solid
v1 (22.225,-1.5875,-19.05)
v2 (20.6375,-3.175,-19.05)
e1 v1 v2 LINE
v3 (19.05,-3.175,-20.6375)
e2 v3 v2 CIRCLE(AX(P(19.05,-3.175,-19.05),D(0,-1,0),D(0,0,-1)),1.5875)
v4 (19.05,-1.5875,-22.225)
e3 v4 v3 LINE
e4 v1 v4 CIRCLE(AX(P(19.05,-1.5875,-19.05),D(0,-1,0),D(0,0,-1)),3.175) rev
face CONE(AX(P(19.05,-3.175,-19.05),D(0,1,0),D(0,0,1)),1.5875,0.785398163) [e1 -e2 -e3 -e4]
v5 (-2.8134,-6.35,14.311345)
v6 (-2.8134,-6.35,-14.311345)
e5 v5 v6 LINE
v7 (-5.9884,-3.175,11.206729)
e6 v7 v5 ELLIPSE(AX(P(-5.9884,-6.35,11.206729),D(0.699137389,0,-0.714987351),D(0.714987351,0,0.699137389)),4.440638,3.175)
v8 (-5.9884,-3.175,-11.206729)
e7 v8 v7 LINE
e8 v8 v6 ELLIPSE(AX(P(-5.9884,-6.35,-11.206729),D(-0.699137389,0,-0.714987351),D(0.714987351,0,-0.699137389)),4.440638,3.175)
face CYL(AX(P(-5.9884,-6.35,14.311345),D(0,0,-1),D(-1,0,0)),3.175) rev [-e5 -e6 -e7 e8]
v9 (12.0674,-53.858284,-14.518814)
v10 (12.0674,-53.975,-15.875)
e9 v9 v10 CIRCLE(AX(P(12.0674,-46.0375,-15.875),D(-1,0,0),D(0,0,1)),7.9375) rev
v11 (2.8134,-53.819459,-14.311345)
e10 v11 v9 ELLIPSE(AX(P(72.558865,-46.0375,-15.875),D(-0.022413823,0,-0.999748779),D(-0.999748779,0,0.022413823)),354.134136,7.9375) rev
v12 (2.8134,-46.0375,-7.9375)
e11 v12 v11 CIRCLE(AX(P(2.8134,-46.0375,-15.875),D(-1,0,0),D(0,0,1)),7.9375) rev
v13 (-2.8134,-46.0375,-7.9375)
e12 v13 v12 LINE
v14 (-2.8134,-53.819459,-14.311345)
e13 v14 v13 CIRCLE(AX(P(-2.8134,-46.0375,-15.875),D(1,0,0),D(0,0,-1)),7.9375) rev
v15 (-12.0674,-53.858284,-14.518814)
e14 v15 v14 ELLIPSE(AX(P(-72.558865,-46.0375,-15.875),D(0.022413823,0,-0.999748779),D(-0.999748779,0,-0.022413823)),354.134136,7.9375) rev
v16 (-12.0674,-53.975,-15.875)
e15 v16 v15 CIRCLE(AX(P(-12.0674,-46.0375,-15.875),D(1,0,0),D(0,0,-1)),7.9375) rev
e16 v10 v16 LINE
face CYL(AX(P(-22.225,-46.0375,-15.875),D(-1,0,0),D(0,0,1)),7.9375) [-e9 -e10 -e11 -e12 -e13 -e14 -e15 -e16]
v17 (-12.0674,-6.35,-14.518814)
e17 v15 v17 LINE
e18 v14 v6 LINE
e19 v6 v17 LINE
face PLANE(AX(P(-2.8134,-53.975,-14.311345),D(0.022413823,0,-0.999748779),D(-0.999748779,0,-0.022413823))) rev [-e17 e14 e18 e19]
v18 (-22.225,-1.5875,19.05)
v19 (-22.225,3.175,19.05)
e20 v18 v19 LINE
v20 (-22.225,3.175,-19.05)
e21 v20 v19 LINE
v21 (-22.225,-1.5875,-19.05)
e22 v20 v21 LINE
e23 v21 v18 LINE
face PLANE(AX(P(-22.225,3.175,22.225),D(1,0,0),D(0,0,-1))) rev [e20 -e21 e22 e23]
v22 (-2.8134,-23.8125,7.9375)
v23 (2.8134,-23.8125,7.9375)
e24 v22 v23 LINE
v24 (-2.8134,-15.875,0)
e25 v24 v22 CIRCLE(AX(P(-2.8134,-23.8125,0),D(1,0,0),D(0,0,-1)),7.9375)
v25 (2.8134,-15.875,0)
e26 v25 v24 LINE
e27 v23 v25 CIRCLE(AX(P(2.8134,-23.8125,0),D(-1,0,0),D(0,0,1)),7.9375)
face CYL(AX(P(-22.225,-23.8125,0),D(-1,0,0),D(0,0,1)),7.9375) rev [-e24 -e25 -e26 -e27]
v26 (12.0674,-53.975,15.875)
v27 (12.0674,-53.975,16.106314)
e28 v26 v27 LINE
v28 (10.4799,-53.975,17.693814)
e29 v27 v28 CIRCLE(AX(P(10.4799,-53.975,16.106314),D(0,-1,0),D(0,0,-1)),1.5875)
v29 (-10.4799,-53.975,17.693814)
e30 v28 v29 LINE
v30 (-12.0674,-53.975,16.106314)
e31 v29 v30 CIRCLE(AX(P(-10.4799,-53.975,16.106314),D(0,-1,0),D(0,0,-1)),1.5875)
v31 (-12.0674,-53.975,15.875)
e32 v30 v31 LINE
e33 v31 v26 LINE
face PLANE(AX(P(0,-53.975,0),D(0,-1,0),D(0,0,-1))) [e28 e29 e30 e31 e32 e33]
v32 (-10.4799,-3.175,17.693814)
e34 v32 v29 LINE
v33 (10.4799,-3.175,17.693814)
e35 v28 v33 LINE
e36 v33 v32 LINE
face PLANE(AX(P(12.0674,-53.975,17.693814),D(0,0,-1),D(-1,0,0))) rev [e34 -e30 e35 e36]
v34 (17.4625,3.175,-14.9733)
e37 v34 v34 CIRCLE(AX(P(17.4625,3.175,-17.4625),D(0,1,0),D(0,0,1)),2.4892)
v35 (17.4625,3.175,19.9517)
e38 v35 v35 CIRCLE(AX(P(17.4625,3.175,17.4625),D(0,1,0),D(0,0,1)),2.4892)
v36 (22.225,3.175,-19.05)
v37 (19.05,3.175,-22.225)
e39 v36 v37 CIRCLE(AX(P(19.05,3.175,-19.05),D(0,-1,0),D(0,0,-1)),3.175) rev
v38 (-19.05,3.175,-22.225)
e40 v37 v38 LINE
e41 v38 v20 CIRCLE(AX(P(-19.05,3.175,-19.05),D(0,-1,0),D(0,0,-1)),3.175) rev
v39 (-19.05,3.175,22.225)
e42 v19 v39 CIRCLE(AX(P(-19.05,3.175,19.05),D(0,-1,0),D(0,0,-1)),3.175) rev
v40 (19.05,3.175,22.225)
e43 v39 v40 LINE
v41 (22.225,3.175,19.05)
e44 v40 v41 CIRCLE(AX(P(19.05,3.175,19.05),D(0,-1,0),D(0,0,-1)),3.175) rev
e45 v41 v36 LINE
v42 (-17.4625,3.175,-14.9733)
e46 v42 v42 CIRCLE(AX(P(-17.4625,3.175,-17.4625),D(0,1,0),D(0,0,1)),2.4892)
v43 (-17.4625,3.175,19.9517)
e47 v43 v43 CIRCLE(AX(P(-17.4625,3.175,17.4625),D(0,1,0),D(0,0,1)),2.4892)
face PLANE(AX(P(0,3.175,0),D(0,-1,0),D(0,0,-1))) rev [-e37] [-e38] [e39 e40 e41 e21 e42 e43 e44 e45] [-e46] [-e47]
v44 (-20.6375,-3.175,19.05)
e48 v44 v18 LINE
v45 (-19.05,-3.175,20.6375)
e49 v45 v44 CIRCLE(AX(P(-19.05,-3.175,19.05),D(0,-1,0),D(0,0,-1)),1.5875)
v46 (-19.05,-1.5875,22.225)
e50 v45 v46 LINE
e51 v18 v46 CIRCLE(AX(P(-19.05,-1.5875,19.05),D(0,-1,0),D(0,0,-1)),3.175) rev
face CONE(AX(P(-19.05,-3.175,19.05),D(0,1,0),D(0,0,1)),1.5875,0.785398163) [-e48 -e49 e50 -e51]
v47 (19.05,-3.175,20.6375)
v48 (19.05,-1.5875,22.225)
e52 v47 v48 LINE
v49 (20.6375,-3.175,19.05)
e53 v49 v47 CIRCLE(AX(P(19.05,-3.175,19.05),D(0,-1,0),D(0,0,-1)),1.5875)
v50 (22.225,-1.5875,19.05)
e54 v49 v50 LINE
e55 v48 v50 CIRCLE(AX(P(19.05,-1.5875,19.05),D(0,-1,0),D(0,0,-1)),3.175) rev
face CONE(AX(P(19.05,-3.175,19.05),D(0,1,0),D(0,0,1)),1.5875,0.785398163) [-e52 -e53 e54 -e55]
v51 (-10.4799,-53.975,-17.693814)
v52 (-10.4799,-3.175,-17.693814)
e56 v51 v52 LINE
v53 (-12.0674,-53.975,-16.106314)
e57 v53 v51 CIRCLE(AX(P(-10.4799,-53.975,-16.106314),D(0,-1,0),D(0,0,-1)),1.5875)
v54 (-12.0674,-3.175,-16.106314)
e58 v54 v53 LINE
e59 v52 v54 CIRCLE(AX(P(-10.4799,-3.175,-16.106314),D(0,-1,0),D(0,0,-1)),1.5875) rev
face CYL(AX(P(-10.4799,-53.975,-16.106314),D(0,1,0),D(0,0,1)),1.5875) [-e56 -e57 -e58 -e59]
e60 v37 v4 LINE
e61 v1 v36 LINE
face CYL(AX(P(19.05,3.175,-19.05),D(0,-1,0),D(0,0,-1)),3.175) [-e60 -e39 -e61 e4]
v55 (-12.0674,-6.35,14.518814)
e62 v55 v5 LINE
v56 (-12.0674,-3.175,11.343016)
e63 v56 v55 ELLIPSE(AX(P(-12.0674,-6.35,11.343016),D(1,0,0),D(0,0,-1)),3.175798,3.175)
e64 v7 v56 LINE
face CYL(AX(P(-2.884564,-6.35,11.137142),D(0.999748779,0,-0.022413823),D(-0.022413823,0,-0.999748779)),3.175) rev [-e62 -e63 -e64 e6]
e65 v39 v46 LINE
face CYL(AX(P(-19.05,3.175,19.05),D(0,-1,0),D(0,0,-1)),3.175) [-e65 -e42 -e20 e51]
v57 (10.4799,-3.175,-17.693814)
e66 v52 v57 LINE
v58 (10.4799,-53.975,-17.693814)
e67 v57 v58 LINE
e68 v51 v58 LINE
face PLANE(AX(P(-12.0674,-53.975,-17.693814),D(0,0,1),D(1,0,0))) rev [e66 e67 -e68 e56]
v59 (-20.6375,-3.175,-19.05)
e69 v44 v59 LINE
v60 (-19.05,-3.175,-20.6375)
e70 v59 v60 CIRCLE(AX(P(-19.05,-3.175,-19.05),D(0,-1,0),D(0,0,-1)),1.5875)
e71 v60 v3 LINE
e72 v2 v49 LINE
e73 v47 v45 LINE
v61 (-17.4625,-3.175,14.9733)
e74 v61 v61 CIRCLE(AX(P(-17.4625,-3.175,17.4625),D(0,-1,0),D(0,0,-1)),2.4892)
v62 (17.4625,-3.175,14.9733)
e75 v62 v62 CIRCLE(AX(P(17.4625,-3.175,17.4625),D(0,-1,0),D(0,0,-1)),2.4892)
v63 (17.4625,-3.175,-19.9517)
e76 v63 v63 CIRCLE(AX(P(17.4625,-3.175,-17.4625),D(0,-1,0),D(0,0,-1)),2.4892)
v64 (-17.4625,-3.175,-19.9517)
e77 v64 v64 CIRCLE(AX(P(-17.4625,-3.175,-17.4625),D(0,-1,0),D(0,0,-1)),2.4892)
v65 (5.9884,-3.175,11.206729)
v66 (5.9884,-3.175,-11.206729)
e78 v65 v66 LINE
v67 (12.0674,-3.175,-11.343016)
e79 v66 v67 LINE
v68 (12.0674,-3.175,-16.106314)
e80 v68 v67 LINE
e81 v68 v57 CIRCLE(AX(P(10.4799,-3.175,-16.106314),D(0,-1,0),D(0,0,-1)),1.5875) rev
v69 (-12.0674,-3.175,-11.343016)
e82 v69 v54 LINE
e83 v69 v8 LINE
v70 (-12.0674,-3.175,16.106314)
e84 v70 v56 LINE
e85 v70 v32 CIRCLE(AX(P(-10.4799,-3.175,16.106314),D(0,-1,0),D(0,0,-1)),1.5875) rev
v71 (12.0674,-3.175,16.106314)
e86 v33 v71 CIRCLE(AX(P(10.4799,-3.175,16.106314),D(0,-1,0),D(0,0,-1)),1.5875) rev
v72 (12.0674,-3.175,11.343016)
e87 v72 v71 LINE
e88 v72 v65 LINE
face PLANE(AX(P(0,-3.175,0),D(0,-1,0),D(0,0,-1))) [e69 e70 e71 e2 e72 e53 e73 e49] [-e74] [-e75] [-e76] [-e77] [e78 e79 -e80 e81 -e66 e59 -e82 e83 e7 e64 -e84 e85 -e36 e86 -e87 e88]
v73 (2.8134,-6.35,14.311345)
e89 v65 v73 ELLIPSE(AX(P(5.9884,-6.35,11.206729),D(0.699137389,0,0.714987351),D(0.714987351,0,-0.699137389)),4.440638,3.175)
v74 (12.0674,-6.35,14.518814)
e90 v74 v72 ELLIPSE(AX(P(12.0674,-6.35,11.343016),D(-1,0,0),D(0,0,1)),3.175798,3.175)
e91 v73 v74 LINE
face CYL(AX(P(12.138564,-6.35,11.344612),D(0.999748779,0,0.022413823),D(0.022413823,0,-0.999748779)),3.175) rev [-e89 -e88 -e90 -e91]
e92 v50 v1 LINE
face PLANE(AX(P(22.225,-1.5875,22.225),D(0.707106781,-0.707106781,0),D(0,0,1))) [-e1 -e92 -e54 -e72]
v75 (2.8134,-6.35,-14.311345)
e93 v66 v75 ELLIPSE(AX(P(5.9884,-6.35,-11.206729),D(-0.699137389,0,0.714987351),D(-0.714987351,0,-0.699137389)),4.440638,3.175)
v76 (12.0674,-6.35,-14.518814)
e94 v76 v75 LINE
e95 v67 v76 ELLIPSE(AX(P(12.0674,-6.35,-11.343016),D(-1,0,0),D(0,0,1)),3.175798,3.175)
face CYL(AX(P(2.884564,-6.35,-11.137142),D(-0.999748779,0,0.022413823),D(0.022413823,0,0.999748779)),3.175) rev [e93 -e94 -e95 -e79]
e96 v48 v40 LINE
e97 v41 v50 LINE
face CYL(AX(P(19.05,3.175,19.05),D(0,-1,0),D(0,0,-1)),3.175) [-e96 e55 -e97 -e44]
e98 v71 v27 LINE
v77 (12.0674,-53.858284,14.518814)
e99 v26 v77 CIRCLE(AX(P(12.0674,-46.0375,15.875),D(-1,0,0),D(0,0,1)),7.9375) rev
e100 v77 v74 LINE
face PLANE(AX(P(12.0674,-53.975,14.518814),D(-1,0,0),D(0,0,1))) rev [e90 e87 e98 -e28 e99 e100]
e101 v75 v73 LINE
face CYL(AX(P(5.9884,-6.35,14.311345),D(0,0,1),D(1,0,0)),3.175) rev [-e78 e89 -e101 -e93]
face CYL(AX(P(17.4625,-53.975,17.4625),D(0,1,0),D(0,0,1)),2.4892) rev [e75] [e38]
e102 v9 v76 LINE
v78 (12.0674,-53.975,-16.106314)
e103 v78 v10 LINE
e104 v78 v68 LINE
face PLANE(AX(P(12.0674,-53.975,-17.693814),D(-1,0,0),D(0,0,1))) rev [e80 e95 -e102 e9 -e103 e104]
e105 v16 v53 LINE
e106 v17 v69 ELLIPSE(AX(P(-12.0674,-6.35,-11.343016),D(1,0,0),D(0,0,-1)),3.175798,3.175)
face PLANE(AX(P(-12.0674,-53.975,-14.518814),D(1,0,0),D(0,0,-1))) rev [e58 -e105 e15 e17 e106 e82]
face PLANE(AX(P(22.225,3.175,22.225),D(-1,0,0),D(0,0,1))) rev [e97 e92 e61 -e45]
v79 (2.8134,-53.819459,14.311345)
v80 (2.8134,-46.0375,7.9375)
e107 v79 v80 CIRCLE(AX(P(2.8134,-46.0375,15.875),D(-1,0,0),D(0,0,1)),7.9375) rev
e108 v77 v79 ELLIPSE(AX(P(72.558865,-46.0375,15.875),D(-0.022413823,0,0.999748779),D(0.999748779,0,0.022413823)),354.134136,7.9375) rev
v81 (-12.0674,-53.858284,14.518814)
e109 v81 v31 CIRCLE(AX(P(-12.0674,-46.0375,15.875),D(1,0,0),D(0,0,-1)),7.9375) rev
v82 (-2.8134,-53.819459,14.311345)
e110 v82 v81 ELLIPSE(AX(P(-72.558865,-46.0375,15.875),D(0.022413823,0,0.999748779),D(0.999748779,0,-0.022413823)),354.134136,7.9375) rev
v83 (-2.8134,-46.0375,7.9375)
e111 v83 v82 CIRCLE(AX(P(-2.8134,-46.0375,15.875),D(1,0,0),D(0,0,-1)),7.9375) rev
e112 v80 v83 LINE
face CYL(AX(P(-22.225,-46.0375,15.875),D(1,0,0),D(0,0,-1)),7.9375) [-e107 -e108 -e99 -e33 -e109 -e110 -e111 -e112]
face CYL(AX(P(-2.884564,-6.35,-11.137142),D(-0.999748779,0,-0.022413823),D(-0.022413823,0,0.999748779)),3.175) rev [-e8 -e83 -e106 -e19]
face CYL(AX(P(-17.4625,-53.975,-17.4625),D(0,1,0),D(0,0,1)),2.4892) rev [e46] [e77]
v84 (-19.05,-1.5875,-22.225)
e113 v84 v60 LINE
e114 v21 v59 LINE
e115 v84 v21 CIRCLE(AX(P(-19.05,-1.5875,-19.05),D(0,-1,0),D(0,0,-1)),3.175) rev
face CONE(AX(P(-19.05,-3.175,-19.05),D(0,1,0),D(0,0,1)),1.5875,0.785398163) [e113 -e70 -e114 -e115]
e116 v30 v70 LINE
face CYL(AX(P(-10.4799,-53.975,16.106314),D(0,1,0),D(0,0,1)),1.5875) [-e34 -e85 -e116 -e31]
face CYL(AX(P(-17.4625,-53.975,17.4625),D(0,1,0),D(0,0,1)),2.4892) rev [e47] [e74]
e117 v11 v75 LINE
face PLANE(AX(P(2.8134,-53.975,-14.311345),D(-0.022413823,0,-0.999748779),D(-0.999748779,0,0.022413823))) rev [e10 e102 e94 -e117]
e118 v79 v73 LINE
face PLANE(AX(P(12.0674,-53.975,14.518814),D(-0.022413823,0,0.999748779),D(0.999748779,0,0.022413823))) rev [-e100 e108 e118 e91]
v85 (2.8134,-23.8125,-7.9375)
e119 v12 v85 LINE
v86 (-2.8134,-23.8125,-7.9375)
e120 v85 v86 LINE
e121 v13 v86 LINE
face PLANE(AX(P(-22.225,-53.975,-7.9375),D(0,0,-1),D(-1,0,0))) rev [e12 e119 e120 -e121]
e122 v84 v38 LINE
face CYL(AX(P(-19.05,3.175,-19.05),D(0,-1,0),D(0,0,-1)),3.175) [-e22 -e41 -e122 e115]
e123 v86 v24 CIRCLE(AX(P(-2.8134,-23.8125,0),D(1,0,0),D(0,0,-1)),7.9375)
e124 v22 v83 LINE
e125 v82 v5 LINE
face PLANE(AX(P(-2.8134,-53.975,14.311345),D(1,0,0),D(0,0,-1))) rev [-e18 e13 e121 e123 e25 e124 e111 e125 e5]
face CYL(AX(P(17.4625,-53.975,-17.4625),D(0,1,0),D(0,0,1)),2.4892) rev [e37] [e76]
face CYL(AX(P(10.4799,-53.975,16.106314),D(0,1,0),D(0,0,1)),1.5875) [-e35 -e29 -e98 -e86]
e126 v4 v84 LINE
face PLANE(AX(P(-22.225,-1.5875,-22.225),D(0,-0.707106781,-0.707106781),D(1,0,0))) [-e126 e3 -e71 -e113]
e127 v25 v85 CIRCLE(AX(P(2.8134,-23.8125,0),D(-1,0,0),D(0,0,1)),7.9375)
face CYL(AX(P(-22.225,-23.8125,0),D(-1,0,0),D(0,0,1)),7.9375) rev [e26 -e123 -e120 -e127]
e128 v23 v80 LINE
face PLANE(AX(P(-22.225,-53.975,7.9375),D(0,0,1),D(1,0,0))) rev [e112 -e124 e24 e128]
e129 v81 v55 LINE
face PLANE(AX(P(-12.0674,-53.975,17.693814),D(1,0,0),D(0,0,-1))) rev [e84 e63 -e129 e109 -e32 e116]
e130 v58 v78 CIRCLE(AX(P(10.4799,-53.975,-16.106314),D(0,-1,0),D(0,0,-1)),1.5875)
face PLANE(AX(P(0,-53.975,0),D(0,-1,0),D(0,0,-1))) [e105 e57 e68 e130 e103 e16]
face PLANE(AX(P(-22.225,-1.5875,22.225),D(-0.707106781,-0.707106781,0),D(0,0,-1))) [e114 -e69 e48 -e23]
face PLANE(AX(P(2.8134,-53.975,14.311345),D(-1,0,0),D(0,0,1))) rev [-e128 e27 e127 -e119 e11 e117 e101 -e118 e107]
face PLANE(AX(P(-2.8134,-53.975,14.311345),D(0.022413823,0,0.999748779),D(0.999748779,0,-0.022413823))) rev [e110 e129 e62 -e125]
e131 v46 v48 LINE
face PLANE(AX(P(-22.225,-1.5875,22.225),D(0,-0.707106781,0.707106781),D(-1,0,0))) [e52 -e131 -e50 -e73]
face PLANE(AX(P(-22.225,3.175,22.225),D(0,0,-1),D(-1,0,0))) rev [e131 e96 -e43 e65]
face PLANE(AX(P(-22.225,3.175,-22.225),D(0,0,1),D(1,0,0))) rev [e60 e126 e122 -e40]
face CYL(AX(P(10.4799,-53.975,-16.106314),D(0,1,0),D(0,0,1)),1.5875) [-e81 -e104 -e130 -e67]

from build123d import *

# Parameters (mm, degrees)
SKETCH1_W           = 44.45
SKETCH1_H           = 44.45
BOSS_EXTRUDE1_DEPTH = 3.175
BOSS_EXTRUDE2_DEPTH = 50.8
FILLET1_R           = 3.175
FILLET2_R           = 1.5875
FILLET3_R           = 3.175
SKETCH4_R           = 2.4892
CUT_EXTRUDE1_DEPTH  = 66.222877505
SKETCH5_W           = 15.875
SKETCH5_H           = 38.1
CUT_EXTRUDE2_DEPTH  = 64.515137759
FILLET4_R           = 7.9375
FILLET5_R           = 7.9375
CHAMFER1_SIZE       = 1.5875


with BuildPart() as part:
    # Sketch1 → Boss-Extrude1 (new, symmetric)
    with BuildSketch(Plane(origin=(0, 0, 0), x_dir=(1, 0, 0), z_dir=(0, 1, 0))):
        Rectangle(SKETCH1_W, SKETCH1_H)
    extrude(amount=BOSS_EXTRUDE1_DEPTH, both=True)

    # Sketch3 → Boss-Extrude2 (add)
    with BuildSketch(Plane.XZ.offset(3.175)):
        Polygon((12.0674, 14.518814274), (2.8134, 14.31134463), (2.8134, -14.31134463), (12.0674, -14.518814274), (12.0674, -17.693814274), (-12.0674, -17.693814274), (-12.0674, -14.518814274), (-2.8134, -14.31134463), (-2.8134, 14.31134463), (-12.0674, 14.518814274), (-12.0674, 17.693814274), (12.0674, 17.693814274), align=None)
    extrude(amount=BOSS_EXTRUDE2_DEPTH)

    # Fillet1
    fillet1_edges = [part.edges().sort_by_distance(p)[0] for p in [
        (22.225, 0, 22.225),
        (-22.225, 0, 22.225),
        (-22.225, 0, -22.225),
        (22.225, 0, -22.225),
    ]]
    fillet(fillet1_edges, radius=FILLET1_R)

    # Fillet2
    fillet2_edges = [part.edges().sort_by_distance(p)[0] for p in [
        (12.0674, -28.575, 17.693814274),
        (-12.0674, -28.575, 17.693814274),
        (-12.0674, -28.575, -17.693814274),
        (12.0674, -28.575, -17.693814274),
    ]]
    fillet(fillet2_edges, radius=FILLET2_R)

    # Fillet3
    fillet3_edges = [part.edges().sort_by_distance(p)[0] for p in [
        (7.4404, -3.175, -14.415079452),
        (2.8134, -3.175, 0),
        (7.4404, -3.175, 14.415079452),
        (-7.4404, -3.175, 14.415079452),
        (-2.8134, -3.175, 0),
        (-7.4404, -3.175, -14.415079452),
    ]]
    fillet(fillet3_edges, radius=FILLET3_R)

    # Sketch4 → Cut-Extrude1 (cut, through all)
    with BuildSketch(Plane(origin=(0, 3.175, 0), x_dir=(1, 0, 0), z_dir=(0, 1, 0))):
        with Locations(Location((17.4625, 17.4625, 0), (0, 0, 270))):
            Circle(SKETCH4_R)
        with Locations(Location((17.4625, -17.4625, 0), (0, 0, 270))):
            Circle(SKETCH4_R)
        with Locations(Location((-17.4625, -17.4625, 0), (0, 0, 270))):
            Circle(SKETCH4_R)
        with Locations(Location((-17.4625, 17.4625, 0), (0, 0, 270))):
            Circle(SKETCH4_R)
    extrude(amount=-CUT_EXTRUDE1_DEPTH, mode=Mode.SUBTRACT)

    # Sketch5 → Cut-Extrude2 (cut, through all)
    with BuildSketch(Plane(origin=(2.8134, 0, 0), x_dir=(0, 0, -1), z_dir=(1, 0, 0))):
        with Locations((0, -34.925)):
            Rectangle(SKETCH5_W, SKETCH5_H)
    extrude(amount=-CUT_EXTRUDE2_DEPTH, mode=Mode.SUBTRACT)

    # Fillet4
    fillet4_edges = [part.edges().sort_by_distance(p)[0] for p in [
        (0, -15.875, -7.9375),
        (0, -15.875, 7.9375),
    ]]
    fillet(fillet4_edges, radius=FILLET4_R - 0.0001)  # a hair under: the kernel refuses the full size

    # Fillet5
    fillet5_edges = [part.edges().sort_by_distance(p)[0] for p in [
        (0, -53.975, -7.9375),
        (0, -53.975, 7.9375),
    ]]
    fillet(fillet5_edges, radius=FILLET5_R)

    # Chamfer1
    chamfer1_edges = [part.edges().sort_by_distance(p)[0] for p in [
        (0, -3.175, -22.225),
        (22.225, -3.175, 0),
        (0, -3.175, 22.225),
        (-22.225, -3.175, 0),
        (21.29506403, -3.175, 21.29506403),
        (-21.29506403, -3.175, 21.29506403),
        (-21.29506403, -3.175, -21.29506403),
        (21.29506403, -3.175, -21.29506403),
    ]]
    chamfer(chamfer1_edges, length=CHAMFER1_SIZE)


solid = part.part
